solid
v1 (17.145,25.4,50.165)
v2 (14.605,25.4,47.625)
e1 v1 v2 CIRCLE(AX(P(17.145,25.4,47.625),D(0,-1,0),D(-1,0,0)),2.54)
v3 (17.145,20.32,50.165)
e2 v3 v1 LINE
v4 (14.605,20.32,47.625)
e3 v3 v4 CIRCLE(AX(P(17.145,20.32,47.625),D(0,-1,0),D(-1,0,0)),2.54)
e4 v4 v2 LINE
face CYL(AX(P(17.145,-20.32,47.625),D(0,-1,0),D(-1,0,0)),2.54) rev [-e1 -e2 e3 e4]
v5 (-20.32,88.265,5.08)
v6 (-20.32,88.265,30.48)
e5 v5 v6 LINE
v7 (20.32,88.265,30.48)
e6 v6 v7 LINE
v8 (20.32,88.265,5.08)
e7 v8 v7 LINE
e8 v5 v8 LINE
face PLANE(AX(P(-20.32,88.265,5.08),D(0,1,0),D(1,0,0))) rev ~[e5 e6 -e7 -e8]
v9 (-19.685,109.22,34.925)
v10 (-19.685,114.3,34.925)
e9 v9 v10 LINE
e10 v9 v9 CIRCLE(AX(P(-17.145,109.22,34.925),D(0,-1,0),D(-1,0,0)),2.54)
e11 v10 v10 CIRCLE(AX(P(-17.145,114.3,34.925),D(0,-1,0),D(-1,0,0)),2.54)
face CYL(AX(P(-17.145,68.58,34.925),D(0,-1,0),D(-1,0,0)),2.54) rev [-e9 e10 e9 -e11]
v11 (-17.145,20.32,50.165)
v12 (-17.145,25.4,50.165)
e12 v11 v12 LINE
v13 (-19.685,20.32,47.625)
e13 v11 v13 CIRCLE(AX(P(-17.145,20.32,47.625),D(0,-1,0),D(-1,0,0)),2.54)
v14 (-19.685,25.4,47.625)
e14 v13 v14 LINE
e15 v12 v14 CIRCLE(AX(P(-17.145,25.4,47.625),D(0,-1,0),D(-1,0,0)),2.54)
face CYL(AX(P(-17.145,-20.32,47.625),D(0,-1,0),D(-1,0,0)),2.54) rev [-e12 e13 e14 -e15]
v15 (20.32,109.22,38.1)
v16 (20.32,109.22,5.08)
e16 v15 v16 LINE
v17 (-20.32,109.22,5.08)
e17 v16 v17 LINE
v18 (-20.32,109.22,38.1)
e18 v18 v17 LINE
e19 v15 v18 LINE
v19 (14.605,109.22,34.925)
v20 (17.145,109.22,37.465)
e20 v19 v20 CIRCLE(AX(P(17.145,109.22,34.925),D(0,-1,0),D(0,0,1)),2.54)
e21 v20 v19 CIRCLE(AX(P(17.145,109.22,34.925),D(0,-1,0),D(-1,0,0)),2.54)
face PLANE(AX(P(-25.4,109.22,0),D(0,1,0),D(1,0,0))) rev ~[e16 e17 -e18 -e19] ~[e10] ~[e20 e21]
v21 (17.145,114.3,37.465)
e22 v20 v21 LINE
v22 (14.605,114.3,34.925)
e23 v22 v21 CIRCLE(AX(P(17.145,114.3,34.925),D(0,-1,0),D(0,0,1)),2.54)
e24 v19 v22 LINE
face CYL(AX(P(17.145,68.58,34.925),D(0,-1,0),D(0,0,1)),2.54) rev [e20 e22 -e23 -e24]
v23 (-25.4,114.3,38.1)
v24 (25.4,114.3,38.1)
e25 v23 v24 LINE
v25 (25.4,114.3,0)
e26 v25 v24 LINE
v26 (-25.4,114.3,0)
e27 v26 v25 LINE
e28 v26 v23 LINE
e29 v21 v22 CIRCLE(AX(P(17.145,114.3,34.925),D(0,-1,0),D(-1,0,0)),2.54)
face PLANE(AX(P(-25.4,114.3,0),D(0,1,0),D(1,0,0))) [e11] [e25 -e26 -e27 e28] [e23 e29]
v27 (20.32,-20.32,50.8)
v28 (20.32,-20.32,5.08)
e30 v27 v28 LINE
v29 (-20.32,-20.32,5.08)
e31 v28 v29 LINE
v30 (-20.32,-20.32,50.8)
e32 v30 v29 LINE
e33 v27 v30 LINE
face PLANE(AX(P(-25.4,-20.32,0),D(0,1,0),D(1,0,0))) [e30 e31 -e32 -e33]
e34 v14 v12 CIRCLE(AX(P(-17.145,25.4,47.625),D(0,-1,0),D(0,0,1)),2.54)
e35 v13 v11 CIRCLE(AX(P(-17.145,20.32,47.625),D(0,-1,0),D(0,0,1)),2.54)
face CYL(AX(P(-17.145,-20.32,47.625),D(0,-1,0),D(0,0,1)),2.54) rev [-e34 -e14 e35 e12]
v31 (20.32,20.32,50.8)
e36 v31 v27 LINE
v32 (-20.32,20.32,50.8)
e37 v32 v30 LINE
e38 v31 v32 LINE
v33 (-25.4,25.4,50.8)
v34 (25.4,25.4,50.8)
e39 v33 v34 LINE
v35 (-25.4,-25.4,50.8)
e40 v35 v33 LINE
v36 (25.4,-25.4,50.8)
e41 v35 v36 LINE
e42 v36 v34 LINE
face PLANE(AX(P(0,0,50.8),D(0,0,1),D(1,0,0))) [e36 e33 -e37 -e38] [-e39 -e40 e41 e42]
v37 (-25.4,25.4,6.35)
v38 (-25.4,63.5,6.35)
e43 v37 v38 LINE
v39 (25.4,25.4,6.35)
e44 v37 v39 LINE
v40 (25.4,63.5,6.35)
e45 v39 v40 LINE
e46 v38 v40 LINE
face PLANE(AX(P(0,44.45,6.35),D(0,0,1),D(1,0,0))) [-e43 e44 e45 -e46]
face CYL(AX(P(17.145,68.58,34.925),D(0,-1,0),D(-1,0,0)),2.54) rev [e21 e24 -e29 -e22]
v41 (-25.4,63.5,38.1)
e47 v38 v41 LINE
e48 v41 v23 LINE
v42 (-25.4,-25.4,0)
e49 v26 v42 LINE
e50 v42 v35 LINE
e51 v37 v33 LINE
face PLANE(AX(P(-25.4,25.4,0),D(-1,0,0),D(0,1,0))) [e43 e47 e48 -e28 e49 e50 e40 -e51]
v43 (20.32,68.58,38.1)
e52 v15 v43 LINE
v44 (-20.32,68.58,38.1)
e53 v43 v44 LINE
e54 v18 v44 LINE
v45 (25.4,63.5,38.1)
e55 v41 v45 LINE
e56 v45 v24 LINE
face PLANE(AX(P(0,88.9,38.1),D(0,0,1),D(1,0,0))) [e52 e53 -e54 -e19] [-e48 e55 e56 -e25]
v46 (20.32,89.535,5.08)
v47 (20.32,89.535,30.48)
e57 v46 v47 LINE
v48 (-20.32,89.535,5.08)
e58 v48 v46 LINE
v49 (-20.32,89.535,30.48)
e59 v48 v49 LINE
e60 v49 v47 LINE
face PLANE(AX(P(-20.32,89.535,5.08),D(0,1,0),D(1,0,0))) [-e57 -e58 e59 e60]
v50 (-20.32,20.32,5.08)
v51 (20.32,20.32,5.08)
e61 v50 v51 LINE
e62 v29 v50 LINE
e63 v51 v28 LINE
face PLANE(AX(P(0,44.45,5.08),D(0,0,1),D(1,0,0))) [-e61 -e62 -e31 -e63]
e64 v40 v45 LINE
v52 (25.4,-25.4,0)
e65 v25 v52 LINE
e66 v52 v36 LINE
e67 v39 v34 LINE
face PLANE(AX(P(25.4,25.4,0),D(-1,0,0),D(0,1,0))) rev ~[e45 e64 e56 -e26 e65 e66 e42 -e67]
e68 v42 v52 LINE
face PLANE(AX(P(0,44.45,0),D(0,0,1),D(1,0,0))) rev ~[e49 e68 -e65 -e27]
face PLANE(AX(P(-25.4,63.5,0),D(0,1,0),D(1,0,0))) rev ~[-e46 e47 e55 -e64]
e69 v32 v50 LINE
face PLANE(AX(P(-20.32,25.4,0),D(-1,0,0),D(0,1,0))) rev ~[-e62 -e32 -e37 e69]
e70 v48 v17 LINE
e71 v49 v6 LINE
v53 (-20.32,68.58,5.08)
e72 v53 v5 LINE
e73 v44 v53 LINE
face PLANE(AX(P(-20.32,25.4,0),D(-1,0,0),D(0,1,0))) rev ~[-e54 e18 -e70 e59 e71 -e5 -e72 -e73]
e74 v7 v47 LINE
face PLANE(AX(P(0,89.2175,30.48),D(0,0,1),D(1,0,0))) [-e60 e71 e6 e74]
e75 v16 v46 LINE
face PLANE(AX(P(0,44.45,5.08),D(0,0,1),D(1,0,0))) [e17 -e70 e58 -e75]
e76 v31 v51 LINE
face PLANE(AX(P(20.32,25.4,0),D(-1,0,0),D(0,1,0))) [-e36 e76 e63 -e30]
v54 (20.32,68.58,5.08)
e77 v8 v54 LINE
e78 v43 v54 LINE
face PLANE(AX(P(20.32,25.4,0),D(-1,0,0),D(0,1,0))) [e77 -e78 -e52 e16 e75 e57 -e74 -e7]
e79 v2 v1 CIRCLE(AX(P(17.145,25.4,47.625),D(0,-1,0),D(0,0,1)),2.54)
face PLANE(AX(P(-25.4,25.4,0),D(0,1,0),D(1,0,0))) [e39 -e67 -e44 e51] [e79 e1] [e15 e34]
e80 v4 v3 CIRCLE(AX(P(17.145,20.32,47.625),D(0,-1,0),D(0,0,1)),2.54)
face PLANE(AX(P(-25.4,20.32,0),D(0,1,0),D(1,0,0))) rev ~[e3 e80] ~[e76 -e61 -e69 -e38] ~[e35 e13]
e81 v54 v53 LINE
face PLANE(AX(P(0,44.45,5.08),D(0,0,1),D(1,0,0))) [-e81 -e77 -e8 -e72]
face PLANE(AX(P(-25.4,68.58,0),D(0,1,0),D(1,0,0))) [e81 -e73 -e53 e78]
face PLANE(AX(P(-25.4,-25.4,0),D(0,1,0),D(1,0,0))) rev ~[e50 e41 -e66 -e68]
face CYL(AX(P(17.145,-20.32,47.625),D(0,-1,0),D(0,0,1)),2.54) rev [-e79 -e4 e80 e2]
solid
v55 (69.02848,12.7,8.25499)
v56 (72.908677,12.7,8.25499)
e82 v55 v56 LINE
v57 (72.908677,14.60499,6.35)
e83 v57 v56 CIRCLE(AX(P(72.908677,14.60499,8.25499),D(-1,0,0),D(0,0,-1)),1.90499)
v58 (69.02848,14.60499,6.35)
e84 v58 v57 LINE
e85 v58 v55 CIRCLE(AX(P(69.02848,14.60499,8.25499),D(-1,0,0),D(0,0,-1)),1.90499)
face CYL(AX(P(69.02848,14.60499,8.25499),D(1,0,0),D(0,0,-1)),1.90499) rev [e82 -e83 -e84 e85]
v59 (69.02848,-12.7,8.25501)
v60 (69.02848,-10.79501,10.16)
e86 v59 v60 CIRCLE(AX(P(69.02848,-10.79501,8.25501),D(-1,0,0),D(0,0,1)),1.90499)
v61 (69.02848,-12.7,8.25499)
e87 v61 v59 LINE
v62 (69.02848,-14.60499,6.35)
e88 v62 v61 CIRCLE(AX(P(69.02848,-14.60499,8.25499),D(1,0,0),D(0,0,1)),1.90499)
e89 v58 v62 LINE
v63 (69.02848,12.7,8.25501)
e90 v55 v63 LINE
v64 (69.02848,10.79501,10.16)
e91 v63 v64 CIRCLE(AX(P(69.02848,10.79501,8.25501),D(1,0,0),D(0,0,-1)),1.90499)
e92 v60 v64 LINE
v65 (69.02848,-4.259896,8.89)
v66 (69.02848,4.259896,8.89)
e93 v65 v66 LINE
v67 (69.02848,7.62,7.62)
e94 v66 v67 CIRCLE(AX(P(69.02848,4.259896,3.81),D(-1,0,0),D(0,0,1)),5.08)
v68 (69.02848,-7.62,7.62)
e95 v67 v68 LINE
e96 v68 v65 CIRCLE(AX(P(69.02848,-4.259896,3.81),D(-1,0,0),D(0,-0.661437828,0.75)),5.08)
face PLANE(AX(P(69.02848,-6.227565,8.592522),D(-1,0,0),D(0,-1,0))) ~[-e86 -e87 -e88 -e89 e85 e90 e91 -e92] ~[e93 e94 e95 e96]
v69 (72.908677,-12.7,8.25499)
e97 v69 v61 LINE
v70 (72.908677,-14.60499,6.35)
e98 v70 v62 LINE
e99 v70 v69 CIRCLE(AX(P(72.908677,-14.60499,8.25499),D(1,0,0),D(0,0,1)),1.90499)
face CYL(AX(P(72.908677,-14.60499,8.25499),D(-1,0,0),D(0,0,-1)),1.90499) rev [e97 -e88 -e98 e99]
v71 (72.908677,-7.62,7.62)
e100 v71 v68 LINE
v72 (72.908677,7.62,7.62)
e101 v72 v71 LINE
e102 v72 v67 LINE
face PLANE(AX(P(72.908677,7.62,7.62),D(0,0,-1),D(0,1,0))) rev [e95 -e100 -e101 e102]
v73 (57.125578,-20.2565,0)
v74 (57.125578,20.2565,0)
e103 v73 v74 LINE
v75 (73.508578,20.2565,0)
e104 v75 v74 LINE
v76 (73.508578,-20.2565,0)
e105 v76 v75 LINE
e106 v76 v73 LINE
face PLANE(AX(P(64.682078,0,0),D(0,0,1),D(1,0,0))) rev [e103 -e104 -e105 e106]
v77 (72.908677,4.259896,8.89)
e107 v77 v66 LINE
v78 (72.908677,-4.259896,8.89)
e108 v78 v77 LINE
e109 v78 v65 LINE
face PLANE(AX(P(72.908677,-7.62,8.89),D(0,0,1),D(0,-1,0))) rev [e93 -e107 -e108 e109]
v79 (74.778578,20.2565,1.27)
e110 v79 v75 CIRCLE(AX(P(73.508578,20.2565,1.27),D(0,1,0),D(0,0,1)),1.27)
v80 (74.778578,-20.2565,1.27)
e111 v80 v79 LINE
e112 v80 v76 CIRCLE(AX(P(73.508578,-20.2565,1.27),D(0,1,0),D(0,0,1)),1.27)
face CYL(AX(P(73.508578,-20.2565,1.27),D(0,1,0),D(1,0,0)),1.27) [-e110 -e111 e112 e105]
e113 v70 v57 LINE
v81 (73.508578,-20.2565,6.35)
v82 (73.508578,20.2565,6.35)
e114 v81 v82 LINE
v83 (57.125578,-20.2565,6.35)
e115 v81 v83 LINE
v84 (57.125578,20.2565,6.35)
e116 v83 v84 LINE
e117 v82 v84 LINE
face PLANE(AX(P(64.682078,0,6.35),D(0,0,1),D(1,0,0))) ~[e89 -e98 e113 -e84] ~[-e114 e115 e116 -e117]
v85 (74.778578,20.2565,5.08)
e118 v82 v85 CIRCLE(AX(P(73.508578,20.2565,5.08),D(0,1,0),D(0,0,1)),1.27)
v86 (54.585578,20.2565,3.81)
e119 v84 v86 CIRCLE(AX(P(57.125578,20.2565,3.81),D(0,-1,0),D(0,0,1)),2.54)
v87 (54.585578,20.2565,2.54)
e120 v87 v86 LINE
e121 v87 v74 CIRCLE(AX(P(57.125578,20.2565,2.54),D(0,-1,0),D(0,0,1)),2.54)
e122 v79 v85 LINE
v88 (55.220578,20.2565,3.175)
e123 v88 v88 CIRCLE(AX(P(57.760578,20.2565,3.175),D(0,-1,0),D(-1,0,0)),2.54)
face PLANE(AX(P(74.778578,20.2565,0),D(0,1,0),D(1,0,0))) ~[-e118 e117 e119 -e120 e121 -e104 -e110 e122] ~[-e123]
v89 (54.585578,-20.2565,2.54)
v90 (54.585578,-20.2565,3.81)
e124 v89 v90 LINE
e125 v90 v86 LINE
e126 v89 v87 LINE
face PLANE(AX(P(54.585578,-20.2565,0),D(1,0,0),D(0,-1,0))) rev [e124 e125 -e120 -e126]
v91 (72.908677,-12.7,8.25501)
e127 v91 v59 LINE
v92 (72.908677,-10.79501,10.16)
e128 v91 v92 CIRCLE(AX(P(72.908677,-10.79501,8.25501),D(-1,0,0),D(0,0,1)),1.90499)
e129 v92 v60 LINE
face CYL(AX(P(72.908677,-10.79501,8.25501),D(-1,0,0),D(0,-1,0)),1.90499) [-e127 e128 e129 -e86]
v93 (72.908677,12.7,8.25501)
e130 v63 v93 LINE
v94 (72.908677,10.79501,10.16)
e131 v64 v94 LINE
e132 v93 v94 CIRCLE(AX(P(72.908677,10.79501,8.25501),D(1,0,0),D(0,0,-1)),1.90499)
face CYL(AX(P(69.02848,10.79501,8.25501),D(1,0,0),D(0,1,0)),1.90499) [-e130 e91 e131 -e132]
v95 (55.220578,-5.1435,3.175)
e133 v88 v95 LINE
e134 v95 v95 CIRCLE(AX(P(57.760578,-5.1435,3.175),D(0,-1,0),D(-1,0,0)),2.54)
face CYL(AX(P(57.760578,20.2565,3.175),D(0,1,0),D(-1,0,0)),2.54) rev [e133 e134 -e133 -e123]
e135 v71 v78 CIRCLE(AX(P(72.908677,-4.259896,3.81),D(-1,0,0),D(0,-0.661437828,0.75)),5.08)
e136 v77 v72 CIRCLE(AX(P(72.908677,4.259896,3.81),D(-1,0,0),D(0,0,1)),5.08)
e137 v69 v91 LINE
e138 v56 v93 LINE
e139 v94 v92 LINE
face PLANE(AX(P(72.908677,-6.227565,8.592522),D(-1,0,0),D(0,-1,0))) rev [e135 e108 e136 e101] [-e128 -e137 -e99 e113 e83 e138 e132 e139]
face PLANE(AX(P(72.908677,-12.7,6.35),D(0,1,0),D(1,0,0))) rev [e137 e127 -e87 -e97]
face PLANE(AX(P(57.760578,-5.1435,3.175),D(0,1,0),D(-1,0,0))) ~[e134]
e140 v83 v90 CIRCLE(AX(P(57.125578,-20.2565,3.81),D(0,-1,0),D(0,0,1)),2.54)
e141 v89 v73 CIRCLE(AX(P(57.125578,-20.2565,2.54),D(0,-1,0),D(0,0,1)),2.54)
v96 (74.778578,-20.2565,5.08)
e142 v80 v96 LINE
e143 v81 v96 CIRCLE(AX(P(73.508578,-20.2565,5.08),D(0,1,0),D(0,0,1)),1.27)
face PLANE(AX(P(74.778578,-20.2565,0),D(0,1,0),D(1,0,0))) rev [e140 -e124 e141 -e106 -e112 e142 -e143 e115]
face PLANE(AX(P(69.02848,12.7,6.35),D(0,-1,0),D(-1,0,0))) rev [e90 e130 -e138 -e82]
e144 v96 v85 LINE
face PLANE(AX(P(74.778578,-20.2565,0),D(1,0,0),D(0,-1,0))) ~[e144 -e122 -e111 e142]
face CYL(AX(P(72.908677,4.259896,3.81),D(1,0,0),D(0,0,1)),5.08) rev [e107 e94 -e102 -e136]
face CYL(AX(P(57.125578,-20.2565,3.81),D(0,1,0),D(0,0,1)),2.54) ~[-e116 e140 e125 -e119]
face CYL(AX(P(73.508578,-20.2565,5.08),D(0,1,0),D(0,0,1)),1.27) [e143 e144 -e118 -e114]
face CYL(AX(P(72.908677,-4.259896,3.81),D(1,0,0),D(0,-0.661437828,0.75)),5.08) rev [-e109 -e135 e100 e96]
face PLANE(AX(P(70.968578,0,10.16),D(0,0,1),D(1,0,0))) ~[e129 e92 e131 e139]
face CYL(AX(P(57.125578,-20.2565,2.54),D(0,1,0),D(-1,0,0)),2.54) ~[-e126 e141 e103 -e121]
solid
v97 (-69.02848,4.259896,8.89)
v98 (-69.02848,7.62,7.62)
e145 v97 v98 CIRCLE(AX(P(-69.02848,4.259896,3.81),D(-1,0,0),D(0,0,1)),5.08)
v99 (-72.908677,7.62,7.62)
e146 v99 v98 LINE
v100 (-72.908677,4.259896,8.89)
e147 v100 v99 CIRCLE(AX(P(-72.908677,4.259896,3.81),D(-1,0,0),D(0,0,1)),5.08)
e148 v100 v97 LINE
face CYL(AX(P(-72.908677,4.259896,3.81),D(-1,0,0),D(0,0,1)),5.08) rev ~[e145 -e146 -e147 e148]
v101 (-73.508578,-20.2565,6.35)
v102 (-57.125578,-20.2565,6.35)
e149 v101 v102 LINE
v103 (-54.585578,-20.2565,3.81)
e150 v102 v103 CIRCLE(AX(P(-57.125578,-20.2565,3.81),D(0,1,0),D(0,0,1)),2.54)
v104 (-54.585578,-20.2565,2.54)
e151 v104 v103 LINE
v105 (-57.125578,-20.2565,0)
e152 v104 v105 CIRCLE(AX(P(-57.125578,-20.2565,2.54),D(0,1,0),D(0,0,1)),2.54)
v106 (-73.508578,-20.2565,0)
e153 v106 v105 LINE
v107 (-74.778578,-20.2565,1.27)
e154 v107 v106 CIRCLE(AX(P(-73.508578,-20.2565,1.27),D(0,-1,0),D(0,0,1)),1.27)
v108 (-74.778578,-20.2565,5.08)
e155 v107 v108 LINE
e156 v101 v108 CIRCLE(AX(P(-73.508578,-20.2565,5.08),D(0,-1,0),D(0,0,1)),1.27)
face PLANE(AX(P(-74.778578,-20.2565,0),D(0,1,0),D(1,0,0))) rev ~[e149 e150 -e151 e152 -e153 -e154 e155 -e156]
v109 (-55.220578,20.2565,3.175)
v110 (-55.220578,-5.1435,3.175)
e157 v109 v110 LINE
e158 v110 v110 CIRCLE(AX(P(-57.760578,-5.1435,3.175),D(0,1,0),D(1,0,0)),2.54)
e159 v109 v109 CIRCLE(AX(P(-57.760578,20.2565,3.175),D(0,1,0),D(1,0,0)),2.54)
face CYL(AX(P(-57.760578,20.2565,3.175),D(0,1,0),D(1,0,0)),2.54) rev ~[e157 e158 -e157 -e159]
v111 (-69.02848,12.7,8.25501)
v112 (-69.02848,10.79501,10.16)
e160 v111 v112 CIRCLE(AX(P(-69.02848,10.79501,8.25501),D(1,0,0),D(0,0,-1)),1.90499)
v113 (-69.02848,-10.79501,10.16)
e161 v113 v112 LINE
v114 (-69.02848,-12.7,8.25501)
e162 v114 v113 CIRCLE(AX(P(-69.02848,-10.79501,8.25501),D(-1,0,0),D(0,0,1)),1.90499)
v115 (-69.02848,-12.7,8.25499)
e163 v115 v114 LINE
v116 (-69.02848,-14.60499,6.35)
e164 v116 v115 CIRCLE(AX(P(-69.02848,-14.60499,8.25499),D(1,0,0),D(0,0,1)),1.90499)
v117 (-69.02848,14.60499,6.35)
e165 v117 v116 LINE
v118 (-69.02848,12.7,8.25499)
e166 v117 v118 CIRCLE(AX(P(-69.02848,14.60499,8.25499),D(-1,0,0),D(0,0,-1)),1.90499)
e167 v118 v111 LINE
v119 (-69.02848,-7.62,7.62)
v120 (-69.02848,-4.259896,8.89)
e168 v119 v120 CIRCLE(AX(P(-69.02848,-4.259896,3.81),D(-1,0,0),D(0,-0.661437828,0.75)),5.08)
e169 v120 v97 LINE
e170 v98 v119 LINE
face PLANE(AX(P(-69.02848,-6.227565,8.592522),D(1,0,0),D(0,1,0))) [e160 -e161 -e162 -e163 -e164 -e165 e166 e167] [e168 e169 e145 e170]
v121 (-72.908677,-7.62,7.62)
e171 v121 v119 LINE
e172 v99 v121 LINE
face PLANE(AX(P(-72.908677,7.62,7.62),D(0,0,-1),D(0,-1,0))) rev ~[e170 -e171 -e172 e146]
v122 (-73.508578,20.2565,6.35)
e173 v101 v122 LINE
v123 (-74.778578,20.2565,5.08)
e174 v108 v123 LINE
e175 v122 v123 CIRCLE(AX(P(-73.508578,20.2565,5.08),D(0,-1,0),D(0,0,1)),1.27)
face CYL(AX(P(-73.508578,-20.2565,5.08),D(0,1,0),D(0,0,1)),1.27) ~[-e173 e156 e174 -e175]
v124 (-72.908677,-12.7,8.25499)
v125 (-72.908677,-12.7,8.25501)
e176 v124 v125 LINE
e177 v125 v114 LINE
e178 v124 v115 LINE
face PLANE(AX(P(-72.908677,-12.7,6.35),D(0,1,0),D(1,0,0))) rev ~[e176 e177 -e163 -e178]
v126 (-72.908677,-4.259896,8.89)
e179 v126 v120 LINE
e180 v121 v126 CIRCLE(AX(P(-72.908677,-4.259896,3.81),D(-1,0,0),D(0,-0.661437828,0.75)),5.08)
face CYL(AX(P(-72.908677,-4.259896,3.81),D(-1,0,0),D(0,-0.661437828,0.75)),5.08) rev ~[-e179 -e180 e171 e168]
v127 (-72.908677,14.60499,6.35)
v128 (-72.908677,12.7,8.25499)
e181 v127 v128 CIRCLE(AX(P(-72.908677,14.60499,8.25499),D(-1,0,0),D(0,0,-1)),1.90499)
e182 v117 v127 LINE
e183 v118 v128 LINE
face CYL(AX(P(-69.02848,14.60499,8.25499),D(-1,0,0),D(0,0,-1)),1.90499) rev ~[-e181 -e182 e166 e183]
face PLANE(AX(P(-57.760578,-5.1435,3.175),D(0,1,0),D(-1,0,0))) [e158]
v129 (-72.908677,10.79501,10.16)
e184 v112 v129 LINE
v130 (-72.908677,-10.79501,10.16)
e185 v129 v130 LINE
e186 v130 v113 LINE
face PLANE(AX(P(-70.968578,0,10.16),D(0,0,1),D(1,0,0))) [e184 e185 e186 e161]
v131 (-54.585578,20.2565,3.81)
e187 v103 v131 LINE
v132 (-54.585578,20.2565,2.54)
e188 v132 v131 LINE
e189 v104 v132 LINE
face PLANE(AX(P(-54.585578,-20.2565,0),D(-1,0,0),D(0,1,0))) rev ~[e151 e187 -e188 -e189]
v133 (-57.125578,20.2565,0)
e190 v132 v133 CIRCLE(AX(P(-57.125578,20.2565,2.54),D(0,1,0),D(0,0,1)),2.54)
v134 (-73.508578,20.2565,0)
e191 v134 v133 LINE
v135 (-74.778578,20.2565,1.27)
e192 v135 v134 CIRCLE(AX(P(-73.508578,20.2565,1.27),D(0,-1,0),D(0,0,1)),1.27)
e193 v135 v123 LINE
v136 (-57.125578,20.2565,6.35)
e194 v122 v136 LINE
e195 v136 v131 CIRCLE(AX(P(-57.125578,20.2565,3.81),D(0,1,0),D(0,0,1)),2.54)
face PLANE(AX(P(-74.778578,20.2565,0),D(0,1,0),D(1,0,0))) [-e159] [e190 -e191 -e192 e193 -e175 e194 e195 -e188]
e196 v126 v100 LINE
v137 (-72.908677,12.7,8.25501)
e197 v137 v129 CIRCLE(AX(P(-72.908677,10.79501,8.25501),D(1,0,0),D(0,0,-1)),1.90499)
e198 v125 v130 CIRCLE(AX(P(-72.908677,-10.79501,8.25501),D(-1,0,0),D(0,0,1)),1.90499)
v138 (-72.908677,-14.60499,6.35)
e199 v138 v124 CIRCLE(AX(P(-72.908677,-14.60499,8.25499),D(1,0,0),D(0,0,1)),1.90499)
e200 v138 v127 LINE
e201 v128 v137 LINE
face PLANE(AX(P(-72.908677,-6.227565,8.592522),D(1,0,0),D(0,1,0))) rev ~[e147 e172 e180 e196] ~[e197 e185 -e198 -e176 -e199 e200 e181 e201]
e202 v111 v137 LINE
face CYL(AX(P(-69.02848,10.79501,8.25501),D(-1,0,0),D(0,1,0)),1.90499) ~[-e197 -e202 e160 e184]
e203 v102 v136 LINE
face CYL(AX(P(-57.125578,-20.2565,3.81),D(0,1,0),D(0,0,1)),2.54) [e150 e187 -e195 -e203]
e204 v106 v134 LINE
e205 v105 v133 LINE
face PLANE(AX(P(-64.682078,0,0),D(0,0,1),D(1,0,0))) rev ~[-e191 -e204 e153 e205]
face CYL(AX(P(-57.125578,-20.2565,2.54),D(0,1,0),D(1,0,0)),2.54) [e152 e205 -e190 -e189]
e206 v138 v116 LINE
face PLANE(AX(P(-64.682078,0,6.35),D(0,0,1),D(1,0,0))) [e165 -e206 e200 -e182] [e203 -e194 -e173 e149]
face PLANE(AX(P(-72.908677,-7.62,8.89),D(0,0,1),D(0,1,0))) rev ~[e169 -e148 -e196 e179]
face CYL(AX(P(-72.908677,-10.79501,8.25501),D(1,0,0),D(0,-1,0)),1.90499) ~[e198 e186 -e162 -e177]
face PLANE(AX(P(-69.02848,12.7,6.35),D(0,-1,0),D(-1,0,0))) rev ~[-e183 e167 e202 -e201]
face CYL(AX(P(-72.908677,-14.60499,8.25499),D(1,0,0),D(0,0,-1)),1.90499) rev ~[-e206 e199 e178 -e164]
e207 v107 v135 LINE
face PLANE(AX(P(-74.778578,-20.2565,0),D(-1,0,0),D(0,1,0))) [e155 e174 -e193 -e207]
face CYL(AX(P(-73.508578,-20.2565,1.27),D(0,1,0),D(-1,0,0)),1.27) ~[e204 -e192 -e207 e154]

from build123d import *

# Parameters (mm, degrees)
F0_W         = 50.8
F0_H         = 50.8
F1_DEPTH     = 50.8
F2_DEPTH     = 38.1
F0_H_2       = 38.1
F3_DEPTH     = 6.35
F4_T         = -5.08
F6_DEPTH     = 50.8
F7_W         = 20.193
F7_H         = 40.513
F8_DEPTH     = 6.35
F11_DEPTH    = 3.81
F12_W        = 7.62
F12_H        = 1.27
F13_DEPTH    = 25.4
F14_R        = 1.90499
F15_T1_DEPTH = 3.8801973377
F16_R        = 2.54
F17_DEPTH    = 50.8
F18_R        = 2.54
F19_R        = 1.27
F20_W        = 40.64
F20_H        = 0.635
F21_DEPTH    = 25.4
F22_DEPTH    = 25.4


# Not quite as in the source:
# - a fillet or chamfer that OpenCascade refuses, or shapes differently, is made with other operations: its cross-section is extruded or revolved along the edge and cut away or added
# - a fillet or chamfer is up to 0.001 mm smaller than in the source, because OpenCascade refuses the exact size


with BuildPart() as f1:
    # F0 (on Top) → F1 (new body)
    with BuildSketch(Plane.XY):
        Rectangle(F0_W, F0_H)
    extrude(amount=F1_DEPTH)



with BuildPart() as f2:
    # F0 (on Top) → F2 (new body)
    with BuildSketch(Plane.XY):
        with Locations((0, 88.9)):
            Rectangle(F0_W, F0_H)
    extrude(amount=F2_DEPTH)


with BuildPart() as f1_1:
    add(f1.part)

    add(f2.part)  # F3 merges F2
    # F0 (on Top) → F3 (join)
    with BuildSketch(Plane.XY):
        with Locations((0, 44.45)):
            Rectangle(F0_W, F0_H_2)
    extrude(amount=F3_DEPTH)

    # F4
    f4_openings = [f1_1.faces().sort_by_distance(p)[0] for p in [
        (0, 88.9, 38.1),
        (0, 0, 50.8),
    ]]
    offset(amount=F4_T, openings=f4_openings, kind=Kind.INTERSECTION)

    # F5 (on face) → F6 (cut)
    with BuildSketch(Plane(origin=(0, -20.32, 0), x_dir=(-1, 0, 0), z_dir=(0, 1, 0))):
        with BuildLine():
            ThreePointArc((-17.145, 50.165), (-18.9410512242, 45.8289487758), (-14.605, 47.625))
            ThreePointArc((-14.605, 47.625), (-15.3489487758, 49.4210512242), (-17.145, 50.165))
        make_face()
        with BuildLine():
            ThreePointArc((17.145, 50.165), (15.3489487758, 45.8289487758), (19.685, 47.625))
            ThreePointArc((19.685, 47.625), (18.9410512242, 49.4210512242), (17.145, 50.165))
        make_face()
    extrude(amount=F6_DEPTH, mode=Mode.SUBTRACT)

    # F16 (on face) → F17 (cut)
    with BuildSketch(Plane(origin=(0, 68.58, 0), x_dir=(-1, 0, 0), z_dir=(0, 1, 0))):
        with BuildLine():
            ThreePointArc((-14.605, 34.925), (-15.3489487758, 36.7210512242), (-17.145, 37.465))
            ThreePointArc((-17.145, 37.465), (-18.9410512242, 33.1289487758), (-14.605, 34.925))
        make_face()
        with Locations((17.145, 34.925)):
            Circle(F16_R)
    extrude(amount=F17_DEPTH, mode=Mode.SUBTRACT)

    # F20 (on face) → F21 (join)
    with BuildSketch(Plane.XY.offset(5.08)):
        with Locations((0, 89.2175)):
            Rectangle(F20_W, F20_H)
        with Locations((0, 88.5825)):
            Rectangle(F20_W, F20_H)
    extrude(amount=F21_DEPTH)


with BuildPart() as f8:
    # F7 (on Top) → F8 (new body)
    with BuildSketch(Plane.XY):
        with Locations((-64.6820784919, 0)):
            Rectangle(F7_W, F7_H)
    extrude(amount=F8_DEPTH)

    # F10 (on face) → F11 (join)
    with BuildSketch(Plane.XY.offset(6.35)):
        Polygon((-72.9086771607, 12.7), (-72.9086771607, 0), (-72.9086771607, -12.7), (-69.028479823, -12.7), (-69.028479823, 12.7), align=None)
    extrude(amount=F11_DEPTH)

    # F12 (on face) → F13 (cut)
    with BuildSketch(Plane(origin=(-72.9086771607, 0, 0), x_dir=(0, -1, 0), z_dir=(-1, 0, 0))):
        with Locations((-3.81, 8.255)):
            Rectangle(F12_W, F12_H)
        with Locations((3.81, 8.255)):
            Rectangle(F12_W, F12_H)
    extrude(amount=-F13_DEPTH, mode=Mode.SUBTRACT)

    # F14 (radius 1.905 in the source; OpenCascade refuses exactly that, so slightly less here)
    f14_edges = [f8.edges().sort_by_distance(p)[0] for p in [
        (-70.968578, -12.7, 10.16),
        (-70.968578, 12.7, 10.16),
        (-70.968578, 12.7, 6.35),
        (-70.968578, -12.7, 6.35),
    ]]
    fillet(f14_edges, radius=F14_R)

    # F15: fillet of radius 5.08 on 2 edges, made by hand

    # F15_s2 → F15_t1 (join)
    with BuildSketch(Plane.YZ.offset(-72.9086771607)):
        with BuildLine():
            ThreePointArc((-7.62, 7.62), (-6.0559470592, 8.5619048812), (-4.2598958349, 8.89))
            Line((-4.2598958349, 8.89), (-7.62, 8.89))
            Line((-7.62, 8.89), (-7.62, 7.62))
        make_face()
        with BuildLine():
            ThreePointArc((4.2598958349, 8.89), (6.0559470592, 8.5619048812), (7.62, 7.62))
            Line((7.62, 7.62), (7.62, 8.89))
            Line((7.62, 8.89), (4.2598958349, 8.89))
        make_face()
    extrude(amount=F15_T1_DEPTH)

    # F18
    f18_edges = [f8.edges().sort_by_distance(p)[0] for p in [
        (-54.585578, 0, 6.35),
        (-54.585578, 0, 0),
    ]]
    fillet(f18_edges, radius=F18_R)

    # F19
    f19_edges = [f8.edges().sort_by_distance(p)[0] for p in [
        (-74.778578, 0, 6.35),
        (-74.778578, 0, 0),
    ]]
    fillet(f19_edges, radius=F19_R)

    # F9 (on face) → F22 (cut)
    with BuildSketch(Plane(origin=(0, 20.2565, 0), x_dir=(-1, 0, 0), z_dir=(0, 1, 0))):
        with BuildLine():
            ThreePointArc((60.3005784919, 3.175), (57.7605784919, 5.715), (55.2205784919, 3.175))
            ThreePointArc((55.2205784919, 3.175), (57.7605784919, 0.635), (60.3005784919, 3.175))
        make_face()
    extrude(amount=-F22_DEPTH, mode=Mode.SUBTRACT)


with BuildPart() as f23_1:
    # F23: instance of F8
    add(f8.part.mirror(Plane.YZ))


solid = Compound([f1_1.part, f8.part, f23_1.part])
